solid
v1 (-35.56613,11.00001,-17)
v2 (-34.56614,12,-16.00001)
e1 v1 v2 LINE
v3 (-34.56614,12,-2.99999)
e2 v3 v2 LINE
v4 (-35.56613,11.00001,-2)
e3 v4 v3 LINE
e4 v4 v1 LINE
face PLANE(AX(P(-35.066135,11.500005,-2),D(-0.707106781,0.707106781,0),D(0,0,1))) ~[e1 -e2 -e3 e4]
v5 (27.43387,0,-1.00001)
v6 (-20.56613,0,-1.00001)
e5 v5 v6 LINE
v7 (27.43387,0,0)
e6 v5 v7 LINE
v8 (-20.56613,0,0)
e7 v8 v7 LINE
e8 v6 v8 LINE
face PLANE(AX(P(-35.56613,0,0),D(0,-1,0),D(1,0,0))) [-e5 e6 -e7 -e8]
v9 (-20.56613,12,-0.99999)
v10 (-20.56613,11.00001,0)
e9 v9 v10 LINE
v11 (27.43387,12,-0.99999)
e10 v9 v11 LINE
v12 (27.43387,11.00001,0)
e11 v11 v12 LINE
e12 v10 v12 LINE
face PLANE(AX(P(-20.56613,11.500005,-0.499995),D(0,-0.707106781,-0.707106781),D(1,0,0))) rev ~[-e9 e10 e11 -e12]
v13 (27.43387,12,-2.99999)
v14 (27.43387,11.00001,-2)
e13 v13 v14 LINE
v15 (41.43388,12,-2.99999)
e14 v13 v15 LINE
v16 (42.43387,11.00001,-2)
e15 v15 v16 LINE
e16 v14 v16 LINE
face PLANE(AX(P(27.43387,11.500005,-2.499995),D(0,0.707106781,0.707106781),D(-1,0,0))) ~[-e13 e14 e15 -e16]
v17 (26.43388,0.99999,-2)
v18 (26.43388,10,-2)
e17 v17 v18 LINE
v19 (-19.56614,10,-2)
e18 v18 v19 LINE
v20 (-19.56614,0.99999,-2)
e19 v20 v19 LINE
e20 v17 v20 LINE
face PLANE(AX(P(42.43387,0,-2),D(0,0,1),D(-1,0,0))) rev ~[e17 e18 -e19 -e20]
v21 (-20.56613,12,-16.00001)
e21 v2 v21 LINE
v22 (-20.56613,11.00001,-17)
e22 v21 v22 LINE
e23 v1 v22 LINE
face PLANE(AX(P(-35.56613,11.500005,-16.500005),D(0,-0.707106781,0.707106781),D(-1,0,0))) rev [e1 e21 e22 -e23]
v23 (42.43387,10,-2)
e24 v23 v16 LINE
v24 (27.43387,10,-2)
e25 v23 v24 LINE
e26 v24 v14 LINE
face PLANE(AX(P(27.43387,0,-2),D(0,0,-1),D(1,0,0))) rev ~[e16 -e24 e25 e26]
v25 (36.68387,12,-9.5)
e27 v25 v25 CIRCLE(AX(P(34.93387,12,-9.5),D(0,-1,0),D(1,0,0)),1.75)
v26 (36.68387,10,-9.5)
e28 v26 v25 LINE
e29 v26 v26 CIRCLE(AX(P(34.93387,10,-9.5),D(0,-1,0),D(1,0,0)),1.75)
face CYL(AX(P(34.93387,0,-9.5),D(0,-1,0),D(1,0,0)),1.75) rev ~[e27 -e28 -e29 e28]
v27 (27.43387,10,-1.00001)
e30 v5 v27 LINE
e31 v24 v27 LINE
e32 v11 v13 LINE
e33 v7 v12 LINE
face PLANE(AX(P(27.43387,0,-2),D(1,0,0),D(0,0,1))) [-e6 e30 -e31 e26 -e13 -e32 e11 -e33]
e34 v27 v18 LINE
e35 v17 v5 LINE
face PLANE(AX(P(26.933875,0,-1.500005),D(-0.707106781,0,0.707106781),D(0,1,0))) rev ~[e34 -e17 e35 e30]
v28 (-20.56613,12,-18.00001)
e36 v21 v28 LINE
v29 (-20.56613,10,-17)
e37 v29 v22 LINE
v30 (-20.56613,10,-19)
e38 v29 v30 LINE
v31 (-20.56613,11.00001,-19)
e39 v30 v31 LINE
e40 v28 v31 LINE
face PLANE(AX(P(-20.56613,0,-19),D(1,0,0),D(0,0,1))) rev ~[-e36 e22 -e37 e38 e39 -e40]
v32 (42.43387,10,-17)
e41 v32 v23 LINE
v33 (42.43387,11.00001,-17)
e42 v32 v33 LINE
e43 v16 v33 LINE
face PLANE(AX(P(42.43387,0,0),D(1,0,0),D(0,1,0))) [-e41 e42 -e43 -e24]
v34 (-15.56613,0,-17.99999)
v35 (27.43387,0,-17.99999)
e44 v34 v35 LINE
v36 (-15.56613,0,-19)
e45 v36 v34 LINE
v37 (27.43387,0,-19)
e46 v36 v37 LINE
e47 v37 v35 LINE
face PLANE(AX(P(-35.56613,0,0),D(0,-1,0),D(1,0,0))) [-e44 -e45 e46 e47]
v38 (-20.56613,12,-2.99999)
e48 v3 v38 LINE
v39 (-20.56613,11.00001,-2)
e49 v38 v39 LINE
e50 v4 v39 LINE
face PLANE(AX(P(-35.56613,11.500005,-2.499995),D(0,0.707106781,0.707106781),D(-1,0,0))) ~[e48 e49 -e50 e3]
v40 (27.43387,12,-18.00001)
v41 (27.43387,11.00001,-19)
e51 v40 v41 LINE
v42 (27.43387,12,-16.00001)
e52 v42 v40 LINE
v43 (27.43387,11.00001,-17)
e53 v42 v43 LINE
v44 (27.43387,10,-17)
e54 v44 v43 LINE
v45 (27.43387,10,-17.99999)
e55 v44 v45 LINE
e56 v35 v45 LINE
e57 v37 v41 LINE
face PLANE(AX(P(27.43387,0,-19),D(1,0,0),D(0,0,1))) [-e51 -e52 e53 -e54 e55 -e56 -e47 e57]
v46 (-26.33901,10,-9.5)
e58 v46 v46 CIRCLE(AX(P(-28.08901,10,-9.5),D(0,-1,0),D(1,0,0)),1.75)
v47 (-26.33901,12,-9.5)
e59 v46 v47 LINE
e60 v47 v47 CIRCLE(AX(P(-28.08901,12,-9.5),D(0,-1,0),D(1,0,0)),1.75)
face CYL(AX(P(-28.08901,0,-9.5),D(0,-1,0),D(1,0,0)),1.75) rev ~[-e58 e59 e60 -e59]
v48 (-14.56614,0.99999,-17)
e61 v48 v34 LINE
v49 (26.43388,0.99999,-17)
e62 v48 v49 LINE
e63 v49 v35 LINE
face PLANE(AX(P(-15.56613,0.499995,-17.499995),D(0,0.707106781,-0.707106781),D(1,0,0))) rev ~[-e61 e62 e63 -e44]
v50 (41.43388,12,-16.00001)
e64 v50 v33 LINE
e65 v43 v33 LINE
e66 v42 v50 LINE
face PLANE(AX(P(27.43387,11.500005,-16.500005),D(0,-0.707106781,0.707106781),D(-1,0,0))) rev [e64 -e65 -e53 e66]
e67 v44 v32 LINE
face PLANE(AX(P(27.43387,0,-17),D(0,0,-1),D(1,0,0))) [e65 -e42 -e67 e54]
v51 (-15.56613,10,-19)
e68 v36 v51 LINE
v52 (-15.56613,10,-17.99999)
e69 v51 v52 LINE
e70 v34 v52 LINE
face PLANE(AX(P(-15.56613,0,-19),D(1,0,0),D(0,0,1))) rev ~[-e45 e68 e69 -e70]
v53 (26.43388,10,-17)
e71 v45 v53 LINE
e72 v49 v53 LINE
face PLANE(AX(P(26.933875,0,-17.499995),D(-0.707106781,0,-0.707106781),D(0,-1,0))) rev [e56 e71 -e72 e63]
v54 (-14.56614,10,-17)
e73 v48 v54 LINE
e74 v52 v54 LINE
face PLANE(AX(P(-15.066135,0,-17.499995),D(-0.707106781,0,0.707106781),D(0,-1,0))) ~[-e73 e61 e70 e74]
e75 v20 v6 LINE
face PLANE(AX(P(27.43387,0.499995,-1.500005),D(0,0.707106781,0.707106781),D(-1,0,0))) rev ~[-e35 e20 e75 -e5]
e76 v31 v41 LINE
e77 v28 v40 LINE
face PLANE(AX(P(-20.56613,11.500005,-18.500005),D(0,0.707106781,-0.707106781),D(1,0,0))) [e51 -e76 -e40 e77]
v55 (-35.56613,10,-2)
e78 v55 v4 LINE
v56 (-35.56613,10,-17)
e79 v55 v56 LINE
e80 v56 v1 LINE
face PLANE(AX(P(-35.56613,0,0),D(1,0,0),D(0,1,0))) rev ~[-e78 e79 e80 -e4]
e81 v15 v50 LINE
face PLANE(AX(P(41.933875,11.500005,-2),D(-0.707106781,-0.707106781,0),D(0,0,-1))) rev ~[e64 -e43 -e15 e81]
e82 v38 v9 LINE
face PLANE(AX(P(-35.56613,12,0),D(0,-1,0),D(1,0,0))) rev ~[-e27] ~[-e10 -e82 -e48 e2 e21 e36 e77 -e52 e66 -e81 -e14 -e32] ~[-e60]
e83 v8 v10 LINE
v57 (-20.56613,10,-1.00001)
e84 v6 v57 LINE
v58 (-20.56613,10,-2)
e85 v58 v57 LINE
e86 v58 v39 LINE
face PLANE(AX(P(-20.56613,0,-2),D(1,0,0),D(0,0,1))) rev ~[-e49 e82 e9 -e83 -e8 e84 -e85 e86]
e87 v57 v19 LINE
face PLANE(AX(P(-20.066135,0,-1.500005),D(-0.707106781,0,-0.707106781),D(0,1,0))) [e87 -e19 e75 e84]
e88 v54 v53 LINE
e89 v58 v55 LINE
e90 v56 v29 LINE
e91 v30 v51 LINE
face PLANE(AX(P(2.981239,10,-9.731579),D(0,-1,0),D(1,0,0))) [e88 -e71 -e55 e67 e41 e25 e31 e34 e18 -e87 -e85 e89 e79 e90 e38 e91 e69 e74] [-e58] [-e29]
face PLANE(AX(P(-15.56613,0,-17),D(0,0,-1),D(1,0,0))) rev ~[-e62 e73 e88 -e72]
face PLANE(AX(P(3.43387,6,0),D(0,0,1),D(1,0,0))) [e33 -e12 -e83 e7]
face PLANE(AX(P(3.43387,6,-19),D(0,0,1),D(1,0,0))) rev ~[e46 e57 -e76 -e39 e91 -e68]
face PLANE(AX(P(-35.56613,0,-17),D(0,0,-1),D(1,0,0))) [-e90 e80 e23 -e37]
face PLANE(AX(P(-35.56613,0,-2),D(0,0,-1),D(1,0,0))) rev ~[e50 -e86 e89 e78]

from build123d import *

# Parameters (mm, degrees)
F0_W      = 78
F0_H      = 12
F1_DEPTH  = 19
F2_R      = 1.75
F3_DEPTH  = 10
F3_FACE_W = 15
F3_FACE_H = 2
F2_W      = 15
F2_H      = 2
F4_DEPTH  = 12
F5_SIZE   = 0.99999


# Not quite as in the source:
# - a fillet or chamfer is up to 0.001 mm smaller than in the source, because OpenCascade refuses the exact size


with BuildPart() as f1:
    # F0 (on Top) → F1 (new body)
    with BuildSketch(Plane.XY):
        with Locations((3.4338701516, 6)):
            Rectangle(F0_W, F0_H)
    extrude(amount=-F1_DEPTH)

    # F2 (on face) → F3 (cut)
    with BuildSketch(Plane.XZ):
        Polygon((-35.5661298484, -17), (-20.5661298484, -17), (-20.5661298484, -19), (-15.5661298484, -19), (-15.5661298484, -17), (27.4338701516, -17), (42.4338701516, -17), (42.4338701516, -2), (27.4338701516, -2), (-20.5661298484, -2), (-35.5661298484, -2), align=None)
        with Locations((-28.0890100524, -9.5)):
            Circle(F2_R, mode=Mode.SUBTRACT)
        with Locations((34.9338701516, -9.5)):
            Circle(F2_R, mode=Mode.SUBTRACT)
    extrude(amount=-F3_DEPTH, mode=Mode.SUBTRACT)

    # F3_face (on face) + F2 (on face) → F4 (cut, through all)
    with BuildSketch(Plane(origin=(-28.0661298484, 0, -18), x_dir=(1, 0, 0), z_dir=(0, -1, 0))):
        Rectangle(F3_FACE_W, F3_FACE_H)
    with BuildSketch(Plane.XZ):
        with Locations((-28.0661298484, -1)):
            Rectangle(F2_W, F2_H)
        with Locations((34.9338701516, -1)):
            Rectangle(F2_W, F2_H)
        with Locations((34.9338701516, -18)):
            Rectangle(F2_W, F2_H)
        with Locations((-28.0890100524, -9.5)):
            Circle(F2_R)
        with Locations((34.9338701516, -9.5)):
            Circle(F2_R)
    extrude(amount=-F4_DEPTH, mode=Mode.SUBTRACT)

    # F5 (size 1 in the source; OpenCascade refuses exactly that, so slightly less here)
    f5_edges = [f1.edges().sort_by_distance(p)[0] for p in [
        (-35.56613, 12, -9.5),
        (-28.06613, 12, -2),
        (3.43387, 12, -19),
        (34.93387, 12, -17),
        (42.43387, 12, -9.5),
        (34.93387, 12, -2),
        (3.43387, 12, 0),
        (3.43387, 0, -2),
        (5.93387, 0, -17),
        (27.43387, 5, -17),
        (27.43387, 5, -2),
        (-15.56613, 5, -17),
        (-20.56613, 5, -2),
        (-28.06613, 12, -17),
    ]]
    chamfer(f5_edges, length=F5_SIZE)


solid = f1.part
